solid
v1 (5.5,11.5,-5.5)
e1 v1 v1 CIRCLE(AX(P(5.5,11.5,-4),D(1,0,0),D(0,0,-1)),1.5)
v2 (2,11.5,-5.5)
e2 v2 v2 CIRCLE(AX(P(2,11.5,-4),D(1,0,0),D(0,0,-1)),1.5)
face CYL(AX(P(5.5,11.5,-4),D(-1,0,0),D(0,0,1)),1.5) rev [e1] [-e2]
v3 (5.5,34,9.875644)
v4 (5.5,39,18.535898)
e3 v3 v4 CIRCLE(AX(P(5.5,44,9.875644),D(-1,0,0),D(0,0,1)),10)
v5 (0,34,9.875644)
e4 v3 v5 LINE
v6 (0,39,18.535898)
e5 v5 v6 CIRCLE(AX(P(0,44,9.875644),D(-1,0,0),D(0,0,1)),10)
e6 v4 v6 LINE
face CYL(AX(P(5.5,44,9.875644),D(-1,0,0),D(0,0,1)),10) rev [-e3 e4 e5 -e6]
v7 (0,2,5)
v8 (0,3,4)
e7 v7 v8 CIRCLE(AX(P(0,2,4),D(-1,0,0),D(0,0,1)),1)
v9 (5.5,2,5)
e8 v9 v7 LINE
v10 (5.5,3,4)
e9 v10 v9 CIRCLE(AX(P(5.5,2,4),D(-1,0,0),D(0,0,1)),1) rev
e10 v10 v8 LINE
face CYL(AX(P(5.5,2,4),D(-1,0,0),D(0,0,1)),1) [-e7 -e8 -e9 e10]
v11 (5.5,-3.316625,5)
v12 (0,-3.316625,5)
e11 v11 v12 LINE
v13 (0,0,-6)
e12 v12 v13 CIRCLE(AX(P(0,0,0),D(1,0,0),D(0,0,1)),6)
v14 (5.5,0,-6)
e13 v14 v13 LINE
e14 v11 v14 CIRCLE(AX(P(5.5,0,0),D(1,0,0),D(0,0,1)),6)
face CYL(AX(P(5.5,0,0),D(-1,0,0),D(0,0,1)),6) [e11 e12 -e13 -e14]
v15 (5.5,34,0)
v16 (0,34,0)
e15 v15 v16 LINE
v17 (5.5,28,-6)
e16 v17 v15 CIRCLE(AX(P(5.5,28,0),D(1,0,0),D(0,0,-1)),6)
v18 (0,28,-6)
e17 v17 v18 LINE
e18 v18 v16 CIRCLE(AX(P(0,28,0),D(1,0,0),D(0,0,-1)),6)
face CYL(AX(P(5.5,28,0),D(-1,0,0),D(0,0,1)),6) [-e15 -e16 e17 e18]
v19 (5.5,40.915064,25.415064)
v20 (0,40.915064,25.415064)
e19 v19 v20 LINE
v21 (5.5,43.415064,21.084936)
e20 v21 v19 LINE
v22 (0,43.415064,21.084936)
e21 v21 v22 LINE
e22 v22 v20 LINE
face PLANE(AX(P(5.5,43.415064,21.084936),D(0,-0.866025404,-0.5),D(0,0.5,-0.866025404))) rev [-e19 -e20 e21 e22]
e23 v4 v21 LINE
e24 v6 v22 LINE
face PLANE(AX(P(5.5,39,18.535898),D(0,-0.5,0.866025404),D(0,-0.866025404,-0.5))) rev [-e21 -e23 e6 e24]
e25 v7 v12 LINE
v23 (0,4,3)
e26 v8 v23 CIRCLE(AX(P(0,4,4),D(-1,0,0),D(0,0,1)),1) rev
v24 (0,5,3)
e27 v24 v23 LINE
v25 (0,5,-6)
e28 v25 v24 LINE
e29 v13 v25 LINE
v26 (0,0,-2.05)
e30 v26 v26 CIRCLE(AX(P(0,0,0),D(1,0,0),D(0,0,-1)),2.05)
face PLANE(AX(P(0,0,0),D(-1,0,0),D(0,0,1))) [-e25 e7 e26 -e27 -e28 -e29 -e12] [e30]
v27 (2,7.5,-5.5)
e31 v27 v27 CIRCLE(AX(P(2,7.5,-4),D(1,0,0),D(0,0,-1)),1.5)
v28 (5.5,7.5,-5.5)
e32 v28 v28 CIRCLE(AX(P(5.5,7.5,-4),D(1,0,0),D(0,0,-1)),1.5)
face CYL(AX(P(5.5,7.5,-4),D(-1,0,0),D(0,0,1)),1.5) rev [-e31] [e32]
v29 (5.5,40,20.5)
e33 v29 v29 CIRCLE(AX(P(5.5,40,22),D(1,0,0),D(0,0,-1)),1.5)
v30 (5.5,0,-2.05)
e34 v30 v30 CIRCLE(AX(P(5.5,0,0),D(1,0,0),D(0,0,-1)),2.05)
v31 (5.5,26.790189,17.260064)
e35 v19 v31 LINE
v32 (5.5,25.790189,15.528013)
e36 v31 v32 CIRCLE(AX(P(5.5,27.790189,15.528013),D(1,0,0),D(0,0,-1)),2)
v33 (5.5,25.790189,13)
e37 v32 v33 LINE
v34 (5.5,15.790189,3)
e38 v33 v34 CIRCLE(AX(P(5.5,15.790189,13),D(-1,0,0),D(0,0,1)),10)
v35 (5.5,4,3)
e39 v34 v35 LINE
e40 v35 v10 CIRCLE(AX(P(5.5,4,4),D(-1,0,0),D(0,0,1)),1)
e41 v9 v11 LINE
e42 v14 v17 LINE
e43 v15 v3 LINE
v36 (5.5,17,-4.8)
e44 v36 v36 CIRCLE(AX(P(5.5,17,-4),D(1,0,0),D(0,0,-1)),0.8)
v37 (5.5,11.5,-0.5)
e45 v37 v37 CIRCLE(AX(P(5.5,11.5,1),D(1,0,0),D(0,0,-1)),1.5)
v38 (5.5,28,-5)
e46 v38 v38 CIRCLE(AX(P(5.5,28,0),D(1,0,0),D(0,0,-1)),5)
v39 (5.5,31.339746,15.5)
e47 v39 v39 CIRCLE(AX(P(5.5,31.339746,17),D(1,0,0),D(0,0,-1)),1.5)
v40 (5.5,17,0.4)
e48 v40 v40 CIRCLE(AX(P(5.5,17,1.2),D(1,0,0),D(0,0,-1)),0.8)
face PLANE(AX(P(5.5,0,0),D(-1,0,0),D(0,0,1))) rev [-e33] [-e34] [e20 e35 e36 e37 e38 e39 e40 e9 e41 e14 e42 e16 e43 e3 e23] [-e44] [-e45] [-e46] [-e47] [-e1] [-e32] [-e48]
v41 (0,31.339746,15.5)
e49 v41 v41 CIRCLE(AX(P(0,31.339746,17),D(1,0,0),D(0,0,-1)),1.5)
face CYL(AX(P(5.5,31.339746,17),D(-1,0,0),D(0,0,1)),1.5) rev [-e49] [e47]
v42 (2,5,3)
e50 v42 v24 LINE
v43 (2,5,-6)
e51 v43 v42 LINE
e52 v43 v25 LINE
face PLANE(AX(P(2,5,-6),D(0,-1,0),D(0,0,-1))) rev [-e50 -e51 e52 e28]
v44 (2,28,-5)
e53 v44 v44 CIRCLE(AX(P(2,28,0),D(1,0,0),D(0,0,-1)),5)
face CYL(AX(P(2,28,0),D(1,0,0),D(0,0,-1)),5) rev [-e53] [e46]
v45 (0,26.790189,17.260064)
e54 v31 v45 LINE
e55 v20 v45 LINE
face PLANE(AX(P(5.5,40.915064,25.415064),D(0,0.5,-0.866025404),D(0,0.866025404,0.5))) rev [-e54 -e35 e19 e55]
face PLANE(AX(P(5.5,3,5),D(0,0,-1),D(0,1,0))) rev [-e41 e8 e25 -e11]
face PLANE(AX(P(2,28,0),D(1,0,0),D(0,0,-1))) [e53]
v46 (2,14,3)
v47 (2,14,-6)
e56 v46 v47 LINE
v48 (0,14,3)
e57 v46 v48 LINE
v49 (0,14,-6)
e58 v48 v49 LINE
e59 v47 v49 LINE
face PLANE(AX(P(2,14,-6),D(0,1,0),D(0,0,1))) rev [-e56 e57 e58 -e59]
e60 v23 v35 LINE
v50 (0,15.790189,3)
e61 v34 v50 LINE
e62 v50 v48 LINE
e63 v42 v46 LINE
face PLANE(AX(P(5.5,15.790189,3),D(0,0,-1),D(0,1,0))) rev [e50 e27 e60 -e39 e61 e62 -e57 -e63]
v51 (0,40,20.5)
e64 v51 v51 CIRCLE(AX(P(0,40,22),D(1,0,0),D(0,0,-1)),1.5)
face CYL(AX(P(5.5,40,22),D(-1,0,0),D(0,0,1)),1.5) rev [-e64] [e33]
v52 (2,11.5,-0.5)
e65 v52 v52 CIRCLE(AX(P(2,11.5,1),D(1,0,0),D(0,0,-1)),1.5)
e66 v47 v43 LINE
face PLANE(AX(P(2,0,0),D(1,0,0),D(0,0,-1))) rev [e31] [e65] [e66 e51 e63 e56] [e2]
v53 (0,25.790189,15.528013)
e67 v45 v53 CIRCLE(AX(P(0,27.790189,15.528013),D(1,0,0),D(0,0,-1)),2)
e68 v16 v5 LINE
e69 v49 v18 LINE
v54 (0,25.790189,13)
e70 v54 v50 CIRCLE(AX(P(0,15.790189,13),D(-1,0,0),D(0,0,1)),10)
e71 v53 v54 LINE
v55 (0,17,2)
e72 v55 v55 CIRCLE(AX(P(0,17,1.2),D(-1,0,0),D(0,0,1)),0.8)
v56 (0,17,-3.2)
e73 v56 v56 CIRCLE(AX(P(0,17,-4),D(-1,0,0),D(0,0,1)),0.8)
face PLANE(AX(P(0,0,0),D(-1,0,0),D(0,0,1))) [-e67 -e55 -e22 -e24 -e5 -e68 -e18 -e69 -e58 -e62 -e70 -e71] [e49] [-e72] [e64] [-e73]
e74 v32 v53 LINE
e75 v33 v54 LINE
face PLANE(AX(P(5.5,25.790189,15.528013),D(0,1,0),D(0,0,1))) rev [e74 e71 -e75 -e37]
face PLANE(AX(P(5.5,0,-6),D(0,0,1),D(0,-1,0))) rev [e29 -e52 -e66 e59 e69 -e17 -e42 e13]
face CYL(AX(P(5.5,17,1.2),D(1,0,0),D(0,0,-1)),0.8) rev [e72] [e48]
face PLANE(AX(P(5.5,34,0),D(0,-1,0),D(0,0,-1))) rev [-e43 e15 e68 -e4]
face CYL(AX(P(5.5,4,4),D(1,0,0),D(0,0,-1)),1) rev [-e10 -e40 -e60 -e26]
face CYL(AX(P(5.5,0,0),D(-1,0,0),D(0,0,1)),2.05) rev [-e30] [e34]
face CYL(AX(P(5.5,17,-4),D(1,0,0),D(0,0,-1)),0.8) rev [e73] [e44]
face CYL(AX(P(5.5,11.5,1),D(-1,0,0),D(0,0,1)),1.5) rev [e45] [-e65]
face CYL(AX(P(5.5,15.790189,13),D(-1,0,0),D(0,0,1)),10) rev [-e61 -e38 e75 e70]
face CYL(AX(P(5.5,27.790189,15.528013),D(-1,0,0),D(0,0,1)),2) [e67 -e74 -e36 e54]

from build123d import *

# Parameters (mm, degrees)
SKETCH1_R                   = 2.05
SKETCH1_R_2                 = 1.5
BOSS_EXTRUDE1_DEPTH         = 5.5
FILLET1_START               = -1
FILLET1_DEPTH               = 7
FILLET1_2_DEPTH             = 5.5
TAP_DRILL_FOR_M2X0_4_TAP1_D = 1.6
SKETCH4_W                   = 9
SKETCH4_H                   = 9
CUT_EXTRUDE1_DEPTH          = 2
SKETCH5_R                   = 5
CUT_EXTRUDE2_DEPTH          = 3.5


with BuildPart() as part:
    # Sketch1 → Boss-Extrude1 (new body)
    with BuildSketch(Plane(origin=(0, 0, 0), x_dir=(0, 0, -1), z_dir=(1, 0, 0))):
        with BuildLine():
            Line((6, 0), (6, 28))
            ThreePointArc((6, 28), (4.242640687, 32.242640687), (0, 34))
            Line((0, 34), (-9.875644347, 34))
            ThreePointArc((-9.875644347, 34), (-14.875644347, 35.339745962), (-18.535898385, 39))
            Line((-18.535898385, 39), (-21.084936491, 43.415063509))
            Line((-21.084936491, 43.415063509), (-25.415063509, 40.915063509))
            Line((-25.415063509, 40.915063509), (-17.260063509, 26.790189174))
            ThreePointArc((-17.260063509, 26.790189174), (-16.528012702, 26.058138366), (-15.528012702, 25.790189174))
            Line((-15.528012702, 25.790189174), (-13, 25.790189174))
            ThreePointArc((-13, 25.790189174), (-5.928932188, 22.861256986), (-3, 15.790189174))
            Line((-3, 15.790189174), (-3, 3))
            Line((-3, 3), (-5, 3))
            Line((-5, 3), (-5, -3.31662479))
            ThreePointArc((-5, -3.31662479), (1.732050808, -5.744562647), (6, 0))
        make_face()
        Circle(SKETCH1_R, mode=Mode.SUBTRACT)
        with Locations((-22, 40)):
            Circle(SKETCH1_R_2, mode=Mode.SUBTRACT)
        with Locations((-17, 31.339745962)):
            Circle(SKETCH1_R_2, mode=Mode.SUBTRACT)
        with Locations((-1, 11.5)):
            Circle(SKETCH1_R_2, mode=Mode.SUBTRACT)
        with Locations((4, 11.5)):
            Circle(SKETCH1_R_2, mode=Mode.SUBTRACT)
        with Locations((4, 7.5)):
            Circle(SKETCH1_R_2, mode=Mode.SUBTRACT)
    extrude(amount=BOSS_EXTRUDE1_DEPTH)

    # Fillet1: read off the stored shape, not the designer's step
    # Fillet1 outline → Fillet1 (cut)
    with BuildSketch(Plane.YZ.offset(FILLET1_START)):
        with BuildLine():
            ThreePointArc((2, 5), (2.707106781, 4.707106781), (3, 4))
            Line((3, 4), (3, 5))
            Line((3, 5), (2, 5))
        make_face()
    extrude(amount=FILLET1_DEPTH, mode=Mode.SUBTRACT)

    # Fillet1 2 outline → Fillet1 2 (add)
    with BuildSketch(Plane.YZ):
        with BuildLine():
            ThreePointArc((4, 3), (3.292893219, 3.292893219), (3, 4))
            Line((3, 4), (3, 3))
            Line((3, 3), (4, 3))
        make_face()
    extrude(amount=FILLET1_2_DEPTH)

    # Tap Drill for M2x0.4 Tap1 (through all)
    with Locations(Plane(origin=(5.5, 0, 0), x_dir=(0, 0, -1), z_dir=(1, 0, 0))):
        with Locations((-1.2, 17), (4, 17)):
            Hole(TAP_DRILL_FOR_M2X0_4_TAP1_D / 2)

    # Sketch4 → Cut-Extrude1 (cut)
    with BuildSketch(Plane.ZY):
        with Locations((-1.5, 9.5)):
            Rectangle(SKETCH4_W, SKETCH4_H)
    extrude(amount=-CUT_EXTRUDE1_DEPTH, mode=Mode.SUBTRACT)

    # Sketch5 → Cut-Extrude2 (cut)
    with BuildSketch(Plane(origin=(5.5, 0, 0), x_dir=(0, 0, -1), z_dir=(1, 0, 0))):
        with Locations((0, 28)):
            Circle(SKETCH5_R)
    extrude(amount=-CUT_EXTRUDE2_DEPTH, mode=Mode.SUBTRACT)


solid = part.part
